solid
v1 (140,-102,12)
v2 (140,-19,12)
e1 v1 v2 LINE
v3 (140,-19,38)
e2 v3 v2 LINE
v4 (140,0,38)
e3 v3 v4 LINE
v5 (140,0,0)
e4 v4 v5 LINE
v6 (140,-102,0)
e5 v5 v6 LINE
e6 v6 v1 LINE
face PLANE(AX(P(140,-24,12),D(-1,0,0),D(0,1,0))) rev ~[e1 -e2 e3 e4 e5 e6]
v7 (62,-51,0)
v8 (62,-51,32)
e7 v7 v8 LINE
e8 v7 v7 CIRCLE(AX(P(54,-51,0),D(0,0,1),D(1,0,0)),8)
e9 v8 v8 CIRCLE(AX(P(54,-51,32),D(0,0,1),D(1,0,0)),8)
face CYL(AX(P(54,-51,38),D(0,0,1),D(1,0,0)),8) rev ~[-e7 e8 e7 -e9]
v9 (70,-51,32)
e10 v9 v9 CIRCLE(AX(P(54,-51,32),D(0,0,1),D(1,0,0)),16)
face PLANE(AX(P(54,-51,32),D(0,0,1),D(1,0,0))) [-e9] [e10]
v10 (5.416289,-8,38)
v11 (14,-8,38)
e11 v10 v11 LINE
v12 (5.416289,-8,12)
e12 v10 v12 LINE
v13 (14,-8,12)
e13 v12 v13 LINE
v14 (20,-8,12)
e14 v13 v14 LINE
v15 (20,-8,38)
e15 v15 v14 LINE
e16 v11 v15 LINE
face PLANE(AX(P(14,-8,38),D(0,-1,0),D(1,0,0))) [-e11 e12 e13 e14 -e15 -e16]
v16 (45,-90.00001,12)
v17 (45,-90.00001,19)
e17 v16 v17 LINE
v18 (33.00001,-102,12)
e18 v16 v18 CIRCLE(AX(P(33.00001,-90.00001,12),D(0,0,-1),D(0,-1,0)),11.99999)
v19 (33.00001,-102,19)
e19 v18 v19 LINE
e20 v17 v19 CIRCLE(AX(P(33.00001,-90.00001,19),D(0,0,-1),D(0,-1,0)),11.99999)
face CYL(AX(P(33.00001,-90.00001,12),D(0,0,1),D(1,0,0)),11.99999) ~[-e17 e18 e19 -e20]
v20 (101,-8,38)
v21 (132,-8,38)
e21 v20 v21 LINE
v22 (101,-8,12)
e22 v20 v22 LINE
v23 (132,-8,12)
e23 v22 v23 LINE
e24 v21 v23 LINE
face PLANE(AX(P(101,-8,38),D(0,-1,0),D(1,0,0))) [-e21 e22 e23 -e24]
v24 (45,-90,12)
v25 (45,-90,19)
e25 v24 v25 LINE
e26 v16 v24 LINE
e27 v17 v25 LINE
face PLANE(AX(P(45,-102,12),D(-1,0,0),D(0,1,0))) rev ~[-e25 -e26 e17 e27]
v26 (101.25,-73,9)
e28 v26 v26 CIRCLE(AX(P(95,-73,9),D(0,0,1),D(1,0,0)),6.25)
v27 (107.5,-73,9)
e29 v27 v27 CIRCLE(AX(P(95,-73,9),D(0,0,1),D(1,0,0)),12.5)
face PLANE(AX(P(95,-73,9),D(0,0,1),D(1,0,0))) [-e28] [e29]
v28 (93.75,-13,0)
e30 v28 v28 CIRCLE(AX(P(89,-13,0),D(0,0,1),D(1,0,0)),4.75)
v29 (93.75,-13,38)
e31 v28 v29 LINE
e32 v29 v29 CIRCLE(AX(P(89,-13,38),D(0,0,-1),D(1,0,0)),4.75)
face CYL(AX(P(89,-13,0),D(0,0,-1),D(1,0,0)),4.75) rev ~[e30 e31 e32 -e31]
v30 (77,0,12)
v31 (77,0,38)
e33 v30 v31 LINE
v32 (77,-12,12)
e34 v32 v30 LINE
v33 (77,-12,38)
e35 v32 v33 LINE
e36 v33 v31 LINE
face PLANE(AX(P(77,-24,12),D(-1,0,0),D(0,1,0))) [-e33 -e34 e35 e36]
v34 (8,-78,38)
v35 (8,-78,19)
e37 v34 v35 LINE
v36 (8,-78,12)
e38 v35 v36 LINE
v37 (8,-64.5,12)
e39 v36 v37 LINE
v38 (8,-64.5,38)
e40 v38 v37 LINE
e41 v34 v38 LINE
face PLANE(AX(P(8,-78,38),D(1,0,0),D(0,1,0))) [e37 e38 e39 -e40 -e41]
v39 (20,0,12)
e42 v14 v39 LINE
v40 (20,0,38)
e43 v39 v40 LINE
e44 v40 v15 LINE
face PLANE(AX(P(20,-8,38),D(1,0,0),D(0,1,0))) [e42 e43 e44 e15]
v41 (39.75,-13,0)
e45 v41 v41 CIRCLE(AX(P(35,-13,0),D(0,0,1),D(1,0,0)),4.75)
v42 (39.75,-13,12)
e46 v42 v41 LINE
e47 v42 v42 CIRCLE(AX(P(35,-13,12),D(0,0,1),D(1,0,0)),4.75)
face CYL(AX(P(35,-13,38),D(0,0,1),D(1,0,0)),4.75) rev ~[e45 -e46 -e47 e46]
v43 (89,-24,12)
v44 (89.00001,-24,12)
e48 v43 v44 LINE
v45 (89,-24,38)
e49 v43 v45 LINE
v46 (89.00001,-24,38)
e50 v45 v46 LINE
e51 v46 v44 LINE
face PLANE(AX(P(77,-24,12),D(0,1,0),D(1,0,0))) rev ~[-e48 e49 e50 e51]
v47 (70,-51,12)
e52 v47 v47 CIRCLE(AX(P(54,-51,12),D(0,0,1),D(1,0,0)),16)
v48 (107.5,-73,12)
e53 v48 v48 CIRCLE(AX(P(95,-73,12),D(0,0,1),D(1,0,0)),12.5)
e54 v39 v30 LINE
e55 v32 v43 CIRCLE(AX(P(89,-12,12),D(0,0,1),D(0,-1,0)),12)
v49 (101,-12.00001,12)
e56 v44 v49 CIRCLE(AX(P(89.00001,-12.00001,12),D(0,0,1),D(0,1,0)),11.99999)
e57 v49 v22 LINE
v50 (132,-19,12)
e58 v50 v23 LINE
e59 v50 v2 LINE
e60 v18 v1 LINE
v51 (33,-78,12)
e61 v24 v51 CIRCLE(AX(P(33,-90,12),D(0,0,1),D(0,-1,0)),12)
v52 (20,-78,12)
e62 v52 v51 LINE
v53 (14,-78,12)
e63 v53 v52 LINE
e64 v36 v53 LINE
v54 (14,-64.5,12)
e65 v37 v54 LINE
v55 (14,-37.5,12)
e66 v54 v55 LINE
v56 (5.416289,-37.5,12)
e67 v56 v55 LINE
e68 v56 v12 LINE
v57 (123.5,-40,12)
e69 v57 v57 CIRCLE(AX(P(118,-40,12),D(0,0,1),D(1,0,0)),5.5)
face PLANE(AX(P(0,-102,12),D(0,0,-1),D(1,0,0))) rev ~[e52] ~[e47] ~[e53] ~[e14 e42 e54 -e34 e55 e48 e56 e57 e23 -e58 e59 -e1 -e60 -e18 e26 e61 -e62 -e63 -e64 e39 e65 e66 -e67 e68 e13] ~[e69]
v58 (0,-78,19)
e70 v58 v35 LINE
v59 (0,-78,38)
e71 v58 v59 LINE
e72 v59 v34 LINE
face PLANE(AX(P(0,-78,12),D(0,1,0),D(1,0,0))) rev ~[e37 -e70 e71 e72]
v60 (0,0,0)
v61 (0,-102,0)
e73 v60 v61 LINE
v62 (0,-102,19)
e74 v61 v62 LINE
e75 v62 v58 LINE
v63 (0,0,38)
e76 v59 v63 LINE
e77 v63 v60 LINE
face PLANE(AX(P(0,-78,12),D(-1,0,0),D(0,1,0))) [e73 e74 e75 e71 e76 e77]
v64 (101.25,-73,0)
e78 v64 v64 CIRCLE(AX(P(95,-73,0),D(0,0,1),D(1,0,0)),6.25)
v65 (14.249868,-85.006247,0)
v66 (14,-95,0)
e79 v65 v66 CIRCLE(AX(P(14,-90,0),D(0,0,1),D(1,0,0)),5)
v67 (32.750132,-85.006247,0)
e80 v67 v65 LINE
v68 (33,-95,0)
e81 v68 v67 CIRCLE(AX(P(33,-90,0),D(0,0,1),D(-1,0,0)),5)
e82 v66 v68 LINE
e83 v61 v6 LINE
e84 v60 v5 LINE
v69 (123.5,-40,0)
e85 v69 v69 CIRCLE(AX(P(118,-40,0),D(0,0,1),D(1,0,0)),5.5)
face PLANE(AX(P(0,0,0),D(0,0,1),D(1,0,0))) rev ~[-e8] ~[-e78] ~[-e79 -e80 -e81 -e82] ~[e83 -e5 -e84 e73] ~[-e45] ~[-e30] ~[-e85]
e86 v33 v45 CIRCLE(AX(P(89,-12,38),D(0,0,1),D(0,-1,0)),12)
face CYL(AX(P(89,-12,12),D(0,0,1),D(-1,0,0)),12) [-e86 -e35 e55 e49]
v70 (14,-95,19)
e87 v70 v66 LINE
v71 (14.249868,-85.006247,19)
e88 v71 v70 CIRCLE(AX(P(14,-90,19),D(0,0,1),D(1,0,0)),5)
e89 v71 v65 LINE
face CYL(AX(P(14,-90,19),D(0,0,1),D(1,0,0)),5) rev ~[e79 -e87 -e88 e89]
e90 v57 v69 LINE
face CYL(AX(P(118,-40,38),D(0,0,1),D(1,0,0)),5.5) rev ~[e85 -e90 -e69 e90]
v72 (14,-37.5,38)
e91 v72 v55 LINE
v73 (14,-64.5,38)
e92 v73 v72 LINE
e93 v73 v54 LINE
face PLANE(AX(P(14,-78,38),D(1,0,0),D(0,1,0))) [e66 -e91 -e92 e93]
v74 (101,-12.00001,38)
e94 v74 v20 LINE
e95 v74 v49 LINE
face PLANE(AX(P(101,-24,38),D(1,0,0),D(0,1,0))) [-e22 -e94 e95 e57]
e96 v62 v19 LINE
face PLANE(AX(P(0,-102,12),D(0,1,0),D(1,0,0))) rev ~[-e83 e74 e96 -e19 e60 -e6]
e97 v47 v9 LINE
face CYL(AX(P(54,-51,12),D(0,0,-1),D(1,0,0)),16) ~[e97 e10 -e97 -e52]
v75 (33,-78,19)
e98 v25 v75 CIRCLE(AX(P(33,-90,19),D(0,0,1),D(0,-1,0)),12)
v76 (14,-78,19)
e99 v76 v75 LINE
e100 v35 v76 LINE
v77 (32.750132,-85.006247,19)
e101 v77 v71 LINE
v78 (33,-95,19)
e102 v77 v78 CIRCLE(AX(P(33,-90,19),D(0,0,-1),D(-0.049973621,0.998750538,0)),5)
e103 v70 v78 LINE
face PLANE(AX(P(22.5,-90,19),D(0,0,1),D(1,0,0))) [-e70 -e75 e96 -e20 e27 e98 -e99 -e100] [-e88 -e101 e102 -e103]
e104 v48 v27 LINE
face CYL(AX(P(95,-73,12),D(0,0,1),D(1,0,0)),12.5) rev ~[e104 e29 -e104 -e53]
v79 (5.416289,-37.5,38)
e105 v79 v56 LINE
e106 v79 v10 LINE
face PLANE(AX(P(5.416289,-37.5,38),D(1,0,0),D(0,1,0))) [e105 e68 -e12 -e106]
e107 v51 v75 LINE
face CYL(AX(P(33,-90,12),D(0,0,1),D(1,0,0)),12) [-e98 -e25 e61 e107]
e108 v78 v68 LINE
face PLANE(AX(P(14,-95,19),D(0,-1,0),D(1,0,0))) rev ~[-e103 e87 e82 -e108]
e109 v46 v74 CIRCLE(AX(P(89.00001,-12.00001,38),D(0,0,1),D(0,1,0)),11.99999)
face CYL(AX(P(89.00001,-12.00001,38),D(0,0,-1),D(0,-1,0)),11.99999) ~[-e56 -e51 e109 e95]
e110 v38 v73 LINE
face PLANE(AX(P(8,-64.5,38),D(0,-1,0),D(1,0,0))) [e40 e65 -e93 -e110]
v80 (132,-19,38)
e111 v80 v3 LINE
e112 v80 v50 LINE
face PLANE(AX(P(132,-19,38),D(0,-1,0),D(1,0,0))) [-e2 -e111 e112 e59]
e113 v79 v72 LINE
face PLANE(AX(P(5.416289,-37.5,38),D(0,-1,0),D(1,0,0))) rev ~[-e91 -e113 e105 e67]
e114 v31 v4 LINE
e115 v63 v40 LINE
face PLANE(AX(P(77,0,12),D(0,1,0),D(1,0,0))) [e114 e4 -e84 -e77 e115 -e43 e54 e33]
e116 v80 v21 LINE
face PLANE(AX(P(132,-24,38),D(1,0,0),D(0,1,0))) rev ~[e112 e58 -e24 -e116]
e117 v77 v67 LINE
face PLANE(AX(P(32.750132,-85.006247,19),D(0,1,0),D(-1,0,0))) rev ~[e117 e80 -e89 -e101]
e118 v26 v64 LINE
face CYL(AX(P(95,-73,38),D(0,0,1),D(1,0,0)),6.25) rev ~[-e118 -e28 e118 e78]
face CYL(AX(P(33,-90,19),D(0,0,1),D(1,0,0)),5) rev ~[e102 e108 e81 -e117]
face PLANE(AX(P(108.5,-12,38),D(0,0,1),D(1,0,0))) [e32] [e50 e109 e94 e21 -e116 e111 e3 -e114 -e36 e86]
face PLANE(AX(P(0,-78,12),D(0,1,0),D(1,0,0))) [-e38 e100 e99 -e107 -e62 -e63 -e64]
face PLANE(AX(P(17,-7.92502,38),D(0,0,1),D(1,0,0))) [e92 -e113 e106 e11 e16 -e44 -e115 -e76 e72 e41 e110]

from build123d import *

# Parameters (mm, degrees)
F0_W      = 140
F0_H      = 38
F1_DEPTH  = 102
F2_R      = 4.75
F3_DEPTH  = 40
F4_R      = 8
F5_DEPTH  = 40
F6_R      = 6.25
F7_DEPTH  = 40
F8_R      = 5.5
F9_DEPTH  = 40
F10_W     = 140
F10_H     = 26
F11_DEPTH = 102
F12_R     = 16
F13_DEPTH = 26
F14_R     = 8
F15_DEPTH = 26
F16_W     = 45
F16_H     = 24
F17_DEPTH = 7
F18_R     = 12
F19_R     = 11.99999
F20_W     = 20
F20_H     = 78
F21_DEPTH = 26
F22_W     = 63
F22_H     = 24
F23_DEPTH = 26
F24_R     = 4.75
F25_DEPTH = 38
F26_R     = 12
F27_R     = 5
F28_DEPTH = 40
F30_DEPTH = 40
F31_W     = 19
F31_H     = 5
F32_DEPTH = 40
F33_W     = 31
F33_H     = 16
F34_DEPTH = 26
F35_R     = 11.99999
F36_W     = 8
F36_H     = 5
F37_DEPTH = 26
F38_R     = 16
F39_DEPTH = 6
F40_W     = 6
F40_H     = 74.1499609053
F41_DEPTH = 26
F42_W     = 6
F42_H     = 4
F43_DEPTH = 26
F44_W     = 6
F44_H     = 13.5
F45_DEPTH = 26
F46_W     = 8.5837110281
F46_H     = 29.5
F47_DEPTH = 26
F48_W     = 6
F48_H     = 0.1499609053
F49_DEPTH = 26
F50_R     = 12.5
F51_DEPTH = 3


# Not quite as in the source:
# - a fillet or chamfer is up to 0.001 mm smaller than in the source, because OpenCascade refuses the exact size


with BuildPart() as f1:
    # F0 (on Front) → F1 (new body)
    with BuildSketch(Plane.XZ):
        with Locations((70, 19)):
            Rectangle(F0_W, F0_H)
    extrude(amount=F1_DEPTH)

    # F2 (on face) → F3 (cut)
    with BuildSketch(Plane.XY.offset(38)):
        with Locations((35, -13)):
            Circle(F2_R)
        with Locations((89, -13)):
            Circle(F2_R)
    extrude(amount=-F3_DEPTH, mode=Mode.SUBTRACT)

    # F4 (on face) → F5 (cut)
    with BuildSketch(Plane.XY.offset(38)):
        with Locations((54, -51)):
            Circle(F4_R)
    extrude(amount=-F5_DEPTH, mode=Mode.SUBTRACT)

    # F6 (on face) → F7 (cut)
    with BuildSketch(Plane.XY.offset(38)):
        with Locations((95, -73)):
            Circle(F6_R)
    extrude(amount=-F7_DEPTH, mode=Mode.SUBTRACT)

    # F8 (on face) → F9 (cut)
    with BuildSketch(Plane.XY.offset(38)):
        with Locations((118, -40)):
            Circle(F8_R)
    extrude(amount=-F9_DEPTH, mode=Mode.SUBTRACT)

    # F10 (on face) → F11 (cut)
    with BuildSketch(Plane.XZ.offset(102)):
        with Locations((70, 25)):
            Rectangle(F10_W, F10_H)
    extrude(amount=-F11_DEPTH, mode=Mode.SUBTRACT)

    # F12 (on face) → F13 (join)
    with BuildSketch(Plane.XY.offset(12)):
        with Locations((54, -51)):
            Circle(F12_R)
    extrude(amount=F13_DEPTH)

    # F14 (on face) → F15 (cut)
    with BuildSketch(Plane.XY.offset(38)):
        with Locations((54, -51)):
            Circle(F14_R)
    extrude(amount=-F15_DEPTH, mode=Mode.SUBTRACT)

    # F16 (on face) → F17 (join)
    with BuildSketch(Plane.XY.offset(12)):
        with Locations((22.5, -90)):
            Rectangle(F16_W, F16_H)
    extrude(amount=F17_DEPTH)

    # F18
    f18_edges = [f1.edges().sort_by_distance(p)[0] for p in [
        (45, -78, 15.5),
    ]]
    fillet(f18_edges, radius=F18_R)

    # F19 (radius 12 in the source; OpenCascade refuses exactly that, so slightly less here)
    f19_edges = [f1.edges().sort_by_distance(p)[0] for p in [
        (45, -102, 15.5),
    ]]
    fillet(f19_edges, radius=F19_R)

    # F20 (on face) → F21 (join)
    with BuildSketch(Plane.XY.offset(12)):
        with Locations((10, -39)):
            Rectangle(F20_W, F20_H)
    extrude(amount=F21_DEPTH)

    # F22 (on face) → F23 (join)
    with BuildSketch(Plane.XY.offset(12)):
        with Locations((108.5, -12)):
            Rectangle(F22_W, F22_H)
    extrude(amount=F23_DEPTH)

    # F24 (on face) → F25 (cut)
    with BuildSketch(Plane(origin=(0, 0, 0), x_dir=(1, 0, 0), z_dir=(0, 0, -1))):
        with Locations((89, 13)):
            Circle(F24_R)
    extrude(amount=-F25_DEPTH, mode=Mode.SUBTRACT)

    # F26
    f26_edges = [f1.edges().sort_by_distance(p)[0] for p in [
        (77, -24, 25),
    ]]
    fillet(f26_edges, radius=F26_R)

    # F27 (on face) → F28 (cut)
    with BuildSketch(Plane.XY.offset(19)):
        with Locations((14, -90)):
            Circle(F27_R)
        with Locations((33, -90)):
            Circle(F27_R)
    extrude(amount=-F28_DEPTH, mode=Mode.SUBTRACT)

    # F29 (on face) → F30 (cut)
    with BuildSketch(Plane.XY.offset(19)):
        with BuildLine():
            ThreePointArc((14.2498681067, -85.00624731), (17.6227986788, -86.5539399696), (19, -90))
            Line((19, -90), (28, -90))
            ThreePointArc((28, -90), (29.3772013212, -86.5539399696), (32.7501318933, -85.00624731))
            Line((32.7501318933, -85.00624731), (14.2498681067, -85.00624731))
        make_face()
    extrude(amount=-F30_DEPTH, mode=Mode.SUBTRACT)

    # F31 (on face) → F32 (cut)
    with BuildSketch(Plane.XY.offset(19)):
        with Locations((23.5, -92.5)):
            Rectangle(F31_W, F31_H)
    extrude(amount=-F32_DEPTH, mode=Mode.SUBTRACT)

    # F33 (on face) → F34 (cut)
    with BuildSketch(Plane.XY.offset(38)):
        with Locations((116.5, -16)):
            Rectangle(F33_W, F33_H)
    extrude(amount=-F34_DEPTH, mode=Mode.SUBTRACT)

    # F35 (radius 12 in the source; OpenCascade refuses exactly that, so slightly less here)
    f35_edges = [f1.edges().sort_by_distance(p)[0] for p in [
        (101, -24, 25),
    ]]
    fillet(f35_edges, radius=F35_R)

    # F36 (on face) → F37 (cut)
    with BuildSketch(Plane.XY.offset(38)):
        with Locations((136, -21.5)):
            Rectangle(F36_W, F36_H)
    extrude(amount=-F37_DEPTH, mode=Mode.SUBTRACT)

    # F38 (on face) → F39 (cut)
    with BuildSketch(Plane.XY.offset(38)):
        with Locations((54, -51)):
            Circle(F38_R)
    extrude(amount=-F39_DEPTH, mode=Mode.SUBTRACT)

    # F40 (on face) → F41 (cut)
    with BuildSketch(Plane.XY.offset(38)):
        with Locations((17, -40.9250195473)):
            Rectangle(F40_W, F40_H)
    extrude(amount=-F41_DEPTH, mode=Mode.SUBTRACT)

    # F42 (on face) → F43 (join)
    with BuildSketch(Plane.XY.offset(12)):
        with Locations((17, -5.8500390947)):
            Rectangle(F42_W, F42_H)
    extrude(amount=F43_DEPTH)

    # F44 (on face) → F45 (cut)
    with BuildSketch(Plane.XY.offset(38)):
        with Locations((11, -71.25)):
            Rectangle(F44_W, F44_H)
    extrude(amount=-F45_DEPTH, mode=Mode.SUBTRACT)

    # F46 (on face) → F47 (cut)
    with BuildSketch(Plane.XY.offset(38)):
        with Locations((9.708144486, -22.75)):
            Rectangle(F46_W, F46_H)
    extrude(amount=-F47_DEPTH, mode=Mode.SUBTRACT)

    # F48 (on face) → F49 (join)
    with BuildSketch(Plane.XY.offset(38)):
        with Locations((17, -7.9250195473)):
            Rectangle(F48_W, F48_H)
    extrude(amount=-F49_DEPTH)

    # F50 (on face) → F51 (cut)
    with BuildSketch(Plane.XY.offset(12)):
        with Locations((95, -73)):
            Circle(F50_R)
    extrude(amount=-F51_DEPTH, mode=Mode.SUBTRACT)


solid = f1.part
